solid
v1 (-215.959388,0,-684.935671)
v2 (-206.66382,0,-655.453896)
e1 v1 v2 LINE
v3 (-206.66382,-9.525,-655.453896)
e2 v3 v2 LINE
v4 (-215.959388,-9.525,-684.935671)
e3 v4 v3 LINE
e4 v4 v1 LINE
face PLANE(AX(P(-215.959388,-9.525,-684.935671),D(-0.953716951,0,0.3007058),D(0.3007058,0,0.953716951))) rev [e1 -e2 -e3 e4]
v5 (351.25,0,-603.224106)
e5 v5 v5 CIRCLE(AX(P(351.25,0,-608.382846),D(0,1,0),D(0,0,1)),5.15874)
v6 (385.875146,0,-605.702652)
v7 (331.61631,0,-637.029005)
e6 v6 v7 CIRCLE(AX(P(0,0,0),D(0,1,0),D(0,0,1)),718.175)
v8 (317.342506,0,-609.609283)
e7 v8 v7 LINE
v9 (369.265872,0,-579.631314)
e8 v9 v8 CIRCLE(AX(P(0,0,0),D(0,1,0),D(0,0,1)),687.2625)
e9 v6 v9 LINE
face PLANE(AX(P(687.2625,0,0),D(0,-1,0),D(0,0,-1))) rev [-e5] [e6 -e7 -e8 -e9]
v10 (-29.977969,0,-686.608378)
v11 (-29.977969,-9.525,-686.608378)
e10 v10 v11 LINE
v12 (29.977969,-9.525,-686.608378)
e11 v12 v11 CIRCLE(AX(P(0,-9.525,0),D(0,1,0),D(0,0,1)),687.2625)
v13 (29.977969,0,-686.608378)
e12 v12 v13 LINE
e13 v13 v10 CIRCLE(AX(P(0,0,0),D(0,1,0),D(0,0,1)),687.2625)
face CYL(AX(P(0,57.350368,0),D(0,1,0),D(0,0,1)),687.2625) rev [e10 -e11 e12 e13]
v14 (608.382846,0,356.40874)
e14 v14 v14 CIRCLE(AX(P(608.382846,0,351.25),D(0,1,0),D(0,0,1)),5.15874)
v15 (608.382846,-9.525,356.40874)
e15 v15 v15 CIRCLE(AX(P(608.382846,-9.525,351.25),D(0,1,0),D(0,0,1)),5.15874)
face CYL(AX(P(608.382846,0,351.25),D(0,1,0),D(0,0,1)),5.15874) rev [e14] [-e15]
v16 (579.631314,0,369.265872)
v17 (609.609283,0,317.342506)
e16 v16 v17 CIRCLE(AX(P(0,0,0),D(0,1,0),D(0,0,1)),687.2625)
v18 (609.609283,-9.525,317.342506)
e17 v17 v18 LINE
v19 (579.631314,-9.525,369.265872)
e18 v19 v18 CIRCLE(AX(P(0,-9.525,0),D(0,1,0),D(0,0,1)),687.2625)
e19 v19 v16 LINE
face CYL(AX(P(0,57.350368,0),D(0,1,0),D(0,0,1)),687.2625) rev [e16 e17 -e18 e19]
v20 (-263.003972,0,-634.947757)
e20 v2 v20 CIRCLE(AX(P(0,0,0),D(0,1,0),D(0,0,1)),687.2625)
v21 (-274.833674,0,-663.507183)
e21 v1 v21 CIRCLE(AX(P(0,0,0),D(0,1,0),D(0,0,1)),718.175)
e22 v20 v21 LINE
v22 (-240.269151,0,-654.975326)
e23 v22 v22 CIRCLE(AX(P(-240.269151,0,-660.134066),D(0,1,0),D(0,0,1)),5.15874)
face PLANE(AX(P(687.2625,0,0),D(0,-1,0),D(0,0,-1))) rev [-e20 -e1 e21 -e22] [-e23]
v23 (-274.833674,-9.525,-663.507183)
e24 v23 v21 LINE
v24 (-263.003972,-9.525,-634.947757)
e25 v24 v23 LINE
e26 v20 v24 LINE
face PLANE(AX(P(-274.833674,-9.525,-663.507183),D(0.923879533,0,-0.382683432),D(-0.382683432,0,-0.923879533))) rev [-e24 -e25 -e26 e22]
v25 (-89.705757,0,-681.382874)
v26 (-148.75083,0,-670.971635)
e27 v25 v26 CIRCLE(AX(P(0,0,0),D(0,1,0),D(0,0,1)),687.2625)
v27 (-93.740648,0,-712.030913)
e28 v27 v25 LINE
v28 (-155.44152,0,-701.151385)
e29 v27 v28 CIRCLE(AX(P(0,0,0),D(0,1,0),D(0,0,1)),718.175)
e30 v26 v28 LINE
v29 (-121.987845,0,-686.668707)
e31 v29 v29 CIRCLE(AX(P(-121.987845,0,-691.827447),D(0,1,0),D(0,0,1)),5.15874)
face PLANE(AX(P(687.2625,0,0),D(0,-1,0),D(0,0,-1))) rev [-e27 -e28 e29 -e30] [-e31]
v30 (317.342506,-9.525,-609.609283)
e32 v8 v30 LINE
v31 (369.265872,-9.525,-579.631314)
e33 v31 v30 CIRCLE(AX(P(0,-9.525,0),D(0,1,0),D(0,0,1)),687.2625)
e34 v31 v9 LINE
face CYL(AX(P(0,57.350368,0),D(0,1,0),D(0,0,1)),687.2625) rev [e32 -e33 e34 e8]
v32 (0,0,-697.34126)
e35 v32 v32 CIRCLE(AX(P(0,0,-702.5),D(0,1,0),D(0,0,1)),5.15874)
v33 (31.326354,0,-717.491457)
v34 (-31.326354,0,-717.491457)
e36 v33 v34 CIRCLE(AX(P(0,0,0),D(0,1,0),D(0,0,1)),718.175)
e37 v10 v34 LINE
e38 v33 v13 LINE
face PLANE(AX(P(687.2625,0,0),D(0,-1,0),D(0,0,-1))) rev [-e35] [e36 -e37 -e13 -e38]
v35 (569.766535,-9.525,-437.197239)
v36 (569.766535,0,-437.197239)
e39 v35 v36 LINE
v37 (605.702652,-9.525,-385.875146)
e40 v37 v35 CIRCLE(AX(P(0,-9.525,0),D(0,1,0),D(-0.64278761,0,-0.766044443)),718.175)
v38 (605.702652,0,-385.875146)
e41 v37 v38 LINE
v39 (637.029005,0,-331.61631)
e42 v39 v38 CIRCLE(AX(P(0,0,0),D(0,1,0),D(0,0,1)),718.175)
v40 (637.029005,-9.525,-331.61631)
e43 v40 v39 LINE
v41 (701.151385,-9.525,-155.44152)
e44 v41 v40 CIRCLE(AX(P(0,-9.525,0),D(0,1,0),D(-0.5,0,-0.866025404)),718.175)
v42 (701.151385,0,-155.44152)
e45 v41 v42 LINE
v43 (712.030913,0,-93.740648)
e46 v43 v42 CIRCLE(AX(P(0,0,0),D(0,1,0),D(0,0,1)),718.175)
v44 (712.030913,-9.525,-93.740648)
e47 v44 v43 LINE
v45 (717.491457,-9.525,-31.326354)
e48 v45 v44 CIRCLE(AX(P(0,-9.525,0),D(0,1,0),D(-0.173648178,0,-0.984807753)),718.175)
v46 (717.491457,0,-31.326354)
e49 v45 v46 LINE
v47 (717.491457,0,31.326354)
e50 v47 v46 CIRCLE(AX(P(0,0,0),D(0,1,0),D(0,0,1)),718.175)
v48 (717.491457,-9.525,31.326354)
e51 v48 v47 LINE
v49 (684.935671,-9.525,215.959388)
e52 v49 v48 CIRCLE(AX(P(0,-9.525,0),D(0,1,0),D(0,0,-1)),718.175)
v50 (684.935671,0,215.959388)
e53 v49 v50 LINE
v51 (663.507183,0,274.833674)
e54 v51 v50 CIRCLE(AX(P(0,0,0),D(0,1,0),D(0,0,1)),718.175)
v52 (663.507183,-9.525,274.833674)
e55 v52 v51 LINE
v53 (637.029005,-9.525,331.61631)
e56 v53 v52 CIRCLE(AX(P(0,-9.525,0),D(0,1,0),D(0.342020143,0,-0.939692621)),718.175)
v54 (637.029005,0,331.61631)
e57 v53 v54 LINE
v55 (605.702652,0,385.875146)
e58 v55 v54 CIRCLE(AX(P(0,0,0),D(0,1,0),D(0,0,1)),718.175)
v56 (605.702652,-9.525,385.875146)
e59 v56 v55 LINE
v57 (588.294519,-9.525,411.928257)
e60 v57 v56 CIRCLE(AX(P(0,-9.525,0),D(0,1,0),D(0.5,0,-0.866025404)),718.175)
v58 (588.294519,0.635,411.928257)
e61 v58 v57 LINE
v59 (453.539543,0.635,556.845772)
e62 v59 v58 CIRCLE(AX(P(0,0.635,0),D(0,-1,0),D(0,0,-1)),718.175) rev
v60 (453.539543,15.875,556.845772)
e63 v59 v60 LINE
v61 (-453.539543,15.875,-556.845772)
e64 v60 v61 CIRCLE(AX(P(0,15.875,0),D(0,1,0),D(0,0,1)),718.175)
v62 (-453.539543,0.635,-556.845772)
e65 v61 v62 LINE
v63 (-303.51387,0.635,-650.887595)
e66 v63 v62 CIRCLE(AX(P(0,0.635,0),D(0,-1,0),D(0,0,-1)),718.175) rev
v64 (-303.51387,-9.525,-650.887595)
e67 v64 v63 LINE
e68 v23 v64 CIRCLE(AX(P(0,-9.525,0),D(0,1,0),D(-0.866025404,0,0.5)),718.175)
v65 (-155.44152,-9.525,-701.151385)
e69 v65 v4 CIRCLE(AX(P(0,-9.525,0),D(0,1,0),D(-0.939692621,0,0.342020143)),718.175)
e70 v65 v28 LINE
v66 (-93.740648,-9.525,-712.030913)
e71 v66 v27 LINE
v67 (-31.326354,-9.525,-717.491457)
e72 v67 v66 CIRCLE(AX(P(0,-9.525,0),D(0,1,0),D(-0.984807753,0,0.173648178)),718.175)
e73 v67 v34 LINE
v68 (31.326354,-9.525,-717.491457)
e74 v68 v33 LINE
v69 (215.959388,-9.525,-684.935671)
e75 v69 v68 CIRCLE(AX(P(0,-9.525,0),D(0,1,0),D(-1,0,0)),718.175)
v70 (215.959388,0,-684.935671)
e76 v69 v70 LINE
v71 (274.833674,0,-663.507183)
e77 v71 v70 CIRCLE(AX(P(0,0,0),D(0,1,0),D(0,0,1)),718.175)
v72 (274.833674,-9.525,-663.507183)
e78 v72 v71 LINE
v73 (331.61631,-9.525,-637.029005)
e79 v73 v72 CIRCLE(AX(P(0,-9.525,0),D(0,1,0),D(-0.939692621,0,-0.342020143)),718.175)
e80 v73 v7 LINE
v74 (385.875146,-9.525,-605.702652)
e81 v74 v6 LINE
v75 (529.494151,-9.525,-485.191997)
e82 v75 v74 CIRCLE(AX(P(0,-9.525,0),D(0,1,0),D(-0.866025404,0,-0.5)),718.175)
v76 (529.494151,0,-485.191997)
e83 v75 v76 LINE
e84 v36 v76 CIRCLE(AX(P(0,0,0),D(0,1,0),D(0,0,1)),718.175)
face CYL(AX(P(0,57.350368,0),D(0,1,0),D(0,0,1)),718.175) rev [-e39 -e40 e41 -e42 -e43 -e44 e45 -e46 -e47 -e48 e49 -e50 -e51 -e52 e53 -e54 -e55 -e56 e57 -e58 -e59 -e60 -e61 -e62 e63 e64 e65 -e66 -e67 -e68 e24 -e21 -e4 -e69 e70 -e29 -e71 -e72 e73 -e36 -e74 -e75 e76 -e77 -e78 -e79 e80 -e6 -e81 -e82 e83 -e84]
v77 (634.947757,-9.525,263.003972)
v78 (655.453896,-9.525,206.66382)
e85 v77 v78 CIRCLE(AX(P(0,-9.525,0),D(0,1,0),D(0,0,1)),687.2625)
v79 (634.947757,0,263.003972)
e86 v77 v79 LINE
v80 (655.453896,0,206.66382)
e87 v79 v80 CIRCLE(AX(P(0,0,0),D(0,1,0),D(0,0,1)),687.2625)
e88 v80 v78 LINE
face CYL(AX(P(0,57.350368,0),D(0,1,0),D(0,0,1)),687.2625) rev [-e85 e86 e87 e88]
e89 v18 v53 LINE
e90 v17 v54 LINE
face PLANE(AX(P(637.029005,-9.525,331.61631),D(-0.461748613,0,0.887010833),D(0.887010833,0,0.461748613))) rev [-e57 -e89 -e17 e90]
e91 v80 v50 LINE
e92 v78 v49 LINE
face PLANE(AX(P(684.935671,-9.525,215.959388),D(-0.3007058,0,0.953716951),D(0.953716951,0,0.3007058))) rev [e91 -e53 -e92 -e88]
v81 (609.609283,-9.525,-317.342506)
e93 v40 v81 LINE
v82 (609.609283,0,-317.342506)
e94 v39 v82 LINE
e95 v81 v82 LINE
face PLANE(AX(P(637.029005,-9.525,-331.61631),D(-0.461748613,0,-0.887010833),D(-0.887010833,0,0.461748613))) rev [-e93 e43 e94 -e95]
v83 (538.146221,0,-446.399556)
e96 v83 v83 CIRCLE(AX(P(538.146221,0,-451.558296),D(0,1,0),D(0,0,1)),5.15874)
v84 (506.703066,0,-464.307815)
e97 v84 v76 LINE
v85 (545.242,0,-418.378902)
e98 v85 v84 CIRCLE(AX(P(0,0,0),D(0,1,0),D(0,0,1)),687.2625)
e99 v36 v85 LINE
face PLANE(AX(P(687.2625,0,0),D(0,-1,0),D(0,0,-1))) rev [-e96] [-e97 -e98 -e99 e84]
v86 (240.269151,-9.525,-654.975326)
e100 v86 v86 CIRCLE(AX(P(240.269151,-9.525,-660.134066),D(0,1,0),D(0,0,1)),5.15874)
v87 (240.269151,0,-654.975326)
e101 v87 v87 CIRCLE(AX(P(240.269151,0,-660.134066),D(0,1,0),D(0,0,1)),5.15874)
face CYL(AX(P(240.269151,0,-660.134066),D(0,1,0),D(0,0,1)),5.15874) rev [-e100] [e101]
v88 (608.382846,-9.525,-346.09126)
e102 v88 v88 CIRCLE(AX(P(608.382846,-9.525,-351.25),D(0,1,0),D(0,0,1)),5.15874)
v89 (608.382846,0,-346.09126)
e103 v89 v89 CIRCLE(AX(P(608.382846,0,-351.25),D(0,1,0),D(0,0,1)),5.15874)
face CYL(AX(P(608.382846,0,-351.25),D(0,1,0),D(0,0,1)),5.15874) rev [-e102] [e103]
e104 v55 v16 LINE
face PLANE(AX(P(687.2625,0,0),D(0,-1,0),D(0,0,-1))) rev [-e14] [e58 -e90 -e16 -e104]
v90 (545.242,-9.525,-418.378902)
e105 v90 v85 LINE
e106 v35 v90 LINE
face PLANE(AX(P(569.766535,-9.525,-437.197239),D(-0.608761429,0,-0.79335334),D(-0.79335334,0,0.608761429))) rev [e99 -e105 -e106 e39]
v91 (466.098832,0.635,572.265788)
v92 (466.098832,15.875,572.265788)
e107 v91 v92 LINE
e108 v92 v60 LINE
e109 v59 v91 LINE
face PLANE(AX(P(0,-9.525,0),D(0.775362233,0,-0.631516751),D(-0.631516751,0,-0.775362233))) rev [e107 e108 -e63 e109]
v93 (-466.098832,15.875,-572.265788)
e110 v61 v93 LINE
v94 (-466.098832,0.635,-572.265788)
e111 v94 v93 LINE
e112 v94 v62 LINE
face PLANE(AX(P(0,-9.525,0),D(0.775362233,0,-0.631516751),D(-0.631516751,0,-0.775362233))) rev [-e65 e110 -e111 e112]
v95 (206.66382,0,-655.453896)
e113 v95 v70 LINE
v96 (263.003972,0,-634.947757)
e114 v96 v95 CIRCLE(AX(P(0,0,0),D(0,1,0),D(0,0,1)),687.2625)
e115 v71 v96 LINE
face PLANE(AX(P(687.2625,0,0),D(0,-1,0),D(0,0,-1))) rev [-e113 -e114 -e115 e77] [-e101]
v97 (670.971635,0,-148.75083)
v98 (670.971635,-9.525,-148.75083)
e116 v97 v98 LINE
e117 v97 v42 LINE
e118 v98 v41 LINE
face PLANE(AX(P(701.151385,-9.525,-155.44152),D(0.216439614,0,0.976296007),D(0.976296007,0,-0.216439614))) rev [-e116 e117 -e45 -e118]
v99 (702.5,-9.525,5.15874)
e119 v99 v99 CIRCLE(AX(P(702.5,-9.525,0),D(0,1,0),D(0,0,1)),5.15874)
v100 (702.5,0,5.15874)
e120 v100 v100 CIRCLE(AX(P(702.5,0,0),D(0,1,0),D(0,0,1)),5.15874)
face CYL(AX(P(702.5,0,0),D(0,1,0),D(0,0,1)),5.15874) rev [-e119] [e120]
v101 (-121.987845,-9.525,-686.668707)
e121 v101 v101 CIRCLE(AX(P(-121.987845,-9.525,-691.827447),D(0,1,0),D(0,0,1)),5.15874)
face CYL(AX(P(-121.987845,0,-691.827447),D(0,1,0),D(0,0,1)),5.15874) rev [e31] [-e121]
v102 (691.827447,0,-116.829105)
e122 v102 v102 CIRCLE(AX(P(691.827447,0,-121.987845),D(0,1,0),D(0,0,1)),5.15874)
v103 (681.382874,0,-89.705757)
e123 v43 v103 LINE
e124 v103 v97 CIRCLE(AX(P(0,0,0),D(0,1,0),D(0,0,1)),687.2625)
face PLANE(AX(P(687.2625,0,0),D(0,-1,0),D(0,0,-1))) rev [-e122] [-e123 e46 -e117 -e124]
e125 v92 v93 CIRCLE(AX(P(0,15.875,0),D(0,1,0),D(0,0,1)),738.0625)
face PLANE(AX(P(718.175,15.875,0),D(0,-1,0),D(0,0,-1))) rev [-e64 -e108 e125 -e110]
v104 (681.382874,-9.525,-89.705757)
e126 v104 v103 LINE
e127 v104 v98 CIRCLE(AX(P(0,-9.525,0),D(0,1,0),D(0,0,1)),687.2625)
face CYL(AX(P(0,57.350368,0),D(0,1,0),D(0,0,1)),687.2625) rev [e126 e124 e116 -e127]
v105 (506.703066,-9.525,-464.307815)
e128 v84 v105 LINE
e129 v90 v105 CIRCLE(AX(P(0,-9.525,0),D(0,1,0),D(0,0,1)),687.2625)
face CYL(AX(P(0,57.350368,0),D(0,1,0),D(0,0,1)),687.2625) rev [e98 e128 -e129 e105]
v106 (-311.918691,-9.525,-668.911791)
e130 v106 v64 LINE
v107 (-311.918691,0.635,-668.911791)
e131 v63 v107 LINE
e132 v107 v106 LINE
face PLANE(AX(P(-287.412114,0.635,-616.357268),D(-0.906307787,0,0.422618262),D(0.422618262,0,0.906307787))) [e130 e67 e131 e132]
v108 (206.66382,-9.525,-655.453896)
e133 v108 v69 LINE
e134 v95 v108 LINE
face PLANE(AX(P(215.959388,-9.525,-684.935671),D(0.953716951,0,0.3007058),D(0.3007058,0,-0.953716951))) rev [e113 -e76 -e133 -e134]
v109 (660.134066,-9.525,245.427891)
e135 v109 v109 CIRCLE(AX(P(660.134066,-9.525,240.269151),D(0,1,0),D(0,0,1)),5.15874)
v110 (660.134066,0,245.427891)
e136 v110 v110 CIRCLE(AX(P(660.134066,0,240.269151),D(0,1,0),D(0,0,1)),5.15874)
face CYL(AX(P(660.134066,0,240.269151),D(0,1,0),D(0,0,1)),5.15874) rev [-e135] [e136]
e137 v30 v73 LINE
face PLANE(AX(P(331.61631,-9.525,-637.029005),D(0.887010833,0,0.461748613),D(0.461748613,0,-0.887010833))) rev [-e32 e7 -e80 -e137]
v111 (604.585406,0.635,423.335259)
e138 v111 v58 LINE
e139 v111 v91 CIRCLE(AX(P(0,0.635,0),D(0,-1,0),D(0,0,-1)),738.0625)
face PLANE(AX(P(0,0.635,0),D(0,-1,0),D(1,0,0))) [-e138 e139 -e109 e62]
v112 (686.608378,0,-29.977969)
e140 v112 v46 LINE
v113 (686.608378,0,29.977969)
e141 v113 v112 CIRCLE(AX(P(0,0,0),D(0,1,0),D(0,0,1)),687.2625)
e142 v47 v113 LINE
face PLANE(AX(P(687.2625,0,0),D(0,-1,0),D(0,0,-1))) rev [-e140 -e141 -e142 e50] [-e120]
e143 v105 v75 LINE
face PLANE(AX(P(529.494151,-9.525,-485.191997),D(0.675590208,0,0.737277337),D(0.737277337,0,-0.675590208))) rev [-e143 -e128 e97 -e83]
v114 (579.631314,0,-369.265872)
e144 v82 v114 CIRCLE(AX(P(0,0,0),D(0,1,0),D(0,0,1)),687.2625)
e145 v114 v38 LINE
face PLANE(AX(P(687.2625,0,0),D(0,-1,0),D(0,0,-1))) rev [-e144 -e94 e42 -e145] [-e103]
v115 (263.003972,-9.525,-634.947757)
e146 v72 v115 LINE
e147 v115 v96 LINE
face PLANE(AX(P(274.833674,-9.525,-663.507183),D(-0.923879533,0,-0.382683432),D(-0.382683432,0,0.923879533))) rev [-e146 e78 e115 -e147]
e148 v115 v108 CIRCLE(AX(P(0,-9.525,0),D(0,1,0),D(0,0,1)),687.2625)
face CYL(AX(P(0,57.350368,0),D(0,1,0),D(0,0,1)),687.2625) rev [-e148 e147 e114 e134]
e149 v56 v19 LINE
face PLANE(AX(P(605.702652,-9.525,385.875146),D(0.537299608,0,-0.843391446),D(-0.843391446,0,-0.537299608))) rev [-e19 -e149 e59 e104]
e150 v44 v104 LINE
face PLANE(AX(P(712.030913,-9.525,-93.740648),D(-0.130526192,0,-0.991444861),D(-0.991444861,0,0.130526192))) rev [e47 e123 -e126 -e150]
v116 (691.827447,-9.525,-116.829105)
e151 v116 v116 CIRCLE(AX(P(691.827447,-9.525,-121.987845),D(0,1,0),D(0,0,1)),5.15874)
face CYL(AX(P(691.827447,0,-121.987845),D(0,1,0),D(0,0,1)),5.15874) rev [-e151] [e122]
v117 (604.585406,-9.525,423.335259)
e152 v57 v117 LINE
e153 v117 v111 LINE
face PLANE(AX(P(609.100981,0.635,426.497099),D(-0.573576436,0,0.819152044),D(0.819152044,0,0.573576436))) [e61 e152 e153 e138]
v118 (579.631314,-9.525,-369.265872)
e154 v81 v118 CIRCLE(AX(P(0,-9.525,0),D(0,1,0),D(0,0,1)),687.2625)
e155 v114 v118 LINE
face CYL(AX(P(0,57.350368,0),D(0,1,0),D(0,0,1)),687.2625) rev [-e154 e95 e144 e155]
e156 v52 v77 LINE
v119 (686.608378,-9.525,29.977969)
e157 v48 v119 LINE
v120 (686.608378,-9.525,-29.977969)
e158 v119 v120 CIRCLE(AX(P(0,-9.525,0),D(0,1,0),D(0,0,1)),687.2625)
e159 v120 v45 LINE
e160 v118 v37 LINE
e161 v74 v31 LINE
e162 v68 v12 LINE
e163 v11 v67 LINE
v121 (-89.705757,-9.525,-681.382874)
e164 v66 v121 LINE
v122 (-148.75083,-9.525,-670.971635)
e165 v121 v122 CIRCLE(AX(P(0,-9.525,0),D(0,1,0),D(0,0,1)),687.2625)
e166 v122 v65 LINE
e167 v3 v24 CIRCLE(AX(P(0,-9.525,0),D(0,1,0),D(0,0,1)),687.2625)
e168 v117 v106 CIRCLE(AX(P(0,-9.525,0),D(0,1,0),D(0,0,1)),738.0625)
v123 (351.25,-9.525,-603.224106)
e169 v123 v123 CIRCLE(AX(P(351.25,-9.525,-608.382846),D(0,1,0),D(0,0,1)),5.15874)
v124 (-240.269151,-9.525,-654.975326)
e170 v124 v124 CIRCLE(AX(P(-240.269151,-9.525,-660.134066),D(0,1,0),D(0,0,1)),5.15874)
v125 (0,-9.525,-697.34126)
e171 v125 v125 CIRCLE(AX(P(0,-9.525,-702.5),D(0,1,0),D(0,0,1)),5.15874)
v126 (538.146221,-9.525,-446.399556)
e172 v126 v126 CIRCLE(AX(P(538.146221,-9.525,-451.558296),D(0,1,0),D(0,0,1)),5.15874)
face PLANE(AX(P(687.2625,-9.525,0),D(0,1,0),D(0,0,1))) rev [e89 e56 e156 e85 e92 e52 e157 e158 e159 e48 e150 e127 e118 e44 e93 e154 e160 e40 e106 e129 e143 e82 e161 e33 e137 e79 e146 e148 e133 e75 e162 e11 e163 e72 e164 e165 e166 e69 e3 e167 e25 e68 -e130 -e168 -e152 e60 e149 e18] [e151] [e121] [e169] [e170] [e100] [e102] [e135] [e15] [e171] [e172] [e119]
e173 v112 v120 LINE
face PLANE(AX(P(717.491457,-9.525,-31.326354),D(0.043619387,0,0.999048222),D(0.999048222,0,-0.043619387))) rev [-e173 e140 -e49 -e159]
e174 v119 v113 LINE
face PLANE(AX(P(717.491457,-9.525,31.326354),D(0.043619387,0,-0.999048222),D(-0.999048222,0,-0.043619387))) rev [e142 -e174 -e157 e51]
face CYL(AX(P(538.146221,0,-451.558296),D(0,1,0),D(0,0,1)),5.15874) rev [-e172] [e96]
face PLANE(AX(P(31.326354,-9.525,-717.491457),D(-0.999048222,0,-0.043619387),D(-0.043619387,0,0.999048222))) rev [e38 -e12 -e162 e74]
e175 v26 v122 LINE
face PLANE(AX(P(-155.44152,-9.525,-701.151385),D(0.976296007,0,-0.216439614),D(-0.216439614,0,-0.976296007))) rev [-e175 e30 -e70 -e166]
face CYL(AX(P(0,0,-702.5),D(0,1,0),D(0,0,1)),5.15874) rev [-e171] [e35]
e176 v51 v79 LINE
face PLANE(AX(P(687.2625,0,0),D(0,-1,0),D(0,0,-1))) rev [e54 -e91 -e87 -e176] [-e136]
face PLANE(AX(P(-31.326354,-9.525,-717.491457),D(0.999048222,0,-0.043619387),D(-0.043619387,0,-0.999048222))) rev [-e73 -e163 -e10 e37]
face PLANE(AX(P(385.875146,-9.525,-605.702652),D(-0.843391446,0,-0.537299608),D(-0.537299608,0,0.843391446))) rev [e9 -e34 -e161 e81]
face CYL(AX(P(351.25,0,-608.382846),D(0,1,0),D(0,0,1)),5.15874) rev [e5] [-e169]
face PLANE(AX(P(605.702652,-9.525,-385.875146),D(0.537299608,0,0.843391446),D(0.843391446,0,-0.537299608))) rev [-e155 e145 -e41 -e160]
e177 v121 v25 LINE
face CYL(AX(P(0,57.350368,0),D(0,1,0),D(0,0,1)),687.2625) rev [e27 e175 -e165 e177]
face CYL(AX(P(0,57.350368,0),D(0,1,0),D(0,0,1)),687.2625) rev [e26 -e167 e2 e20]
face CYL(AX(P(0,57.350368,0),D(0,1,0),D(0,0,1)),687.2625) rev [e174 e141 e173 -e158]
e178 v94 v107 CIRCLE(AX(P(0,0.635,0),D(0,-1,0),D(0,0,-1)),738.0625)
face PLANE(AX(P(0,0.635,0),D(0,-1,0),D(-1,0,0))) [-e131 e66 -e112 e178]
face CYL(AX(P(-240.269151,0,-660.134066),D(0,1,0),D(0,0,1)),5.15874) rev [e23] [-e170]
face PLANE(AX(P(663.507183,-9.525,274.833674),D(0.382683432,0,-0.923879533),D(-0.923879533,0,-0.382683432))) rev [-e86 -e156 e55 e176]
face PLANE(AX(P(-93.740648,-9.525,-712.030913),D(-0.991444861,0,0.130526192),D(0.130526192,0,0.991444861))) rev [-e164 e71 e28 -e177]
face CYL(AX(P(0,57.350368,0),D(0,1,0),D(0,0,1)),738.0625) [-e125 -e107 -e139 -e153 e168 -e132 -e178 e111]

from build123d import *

# Parameters (mm, degrees)
F_3_8_CLEARANCE_HOLE1_D = 10.31748
CUT_EXTRUDE1_DEPTH      = 1044.898713202
CIRPATTERN1_COUNT       = 36
CUT_EXTRUDE_THIN1_START = -10.16
CUT_EXTRUDE_THIN1_DEPTH = 1055.247002027
CIRPATTERN3_COUNT       = 2
CUT_EXTRUDE3_DEPTH      = 1045.087002027
CUT_EXTRUDE4_DEPTH      = 1045.087002027


with BuildPart() as part:
    # Sketch1 → Revolve1 (revolve)
    with BuildSketch(Plane.XY, mode=Mode.PRIVATE) as revolve1_sk:
        Polygon((687.262499996, 0), (687.262499996, -9.525), (738.062499996, -9.525), (738.062499996, 0), (738.062499996, 15.875), (718.17500002, 15.875), (718.17500002, 0), align=None)
    revolve(revolve1_sk.sketch.rotate(Axis((0, 57.350368034, 0), (0, -1, 0)), 90), axis=Axis((0, 57.350368034, 0), (0, -1, 0)))

    # 3/8 Clearance Hole1 (through all)
    with Locations(Plane(origin=(0, 0, 0), x_dir=(1, 0, 0), z_dir=(0, 1, 0))):
        with Locations((702.500000128, 0)):
            f_3_8_clearance_hole1 = Hole(F_3_8_CLEARANCE_HOLE1_D / 2)

    # Sketch16 → Cut-Extrude1 (cut, through all)
    with BuildSketch(Plane(origin=(0, 0, 0), x_dir=(1, 0, 0), z_dir=(0, 1, 0))):
        with BuildLine():
            Line((712.030913337, -93.7406481), (681.382874036, -89.70575718))
            Line((681.382874036, -89.70575718), (0, 0))
            Line((0, 0), (686.608378381, -29.977969209))
            Line((686.608378381, -29.977969209), (717.491456555, -31.326353522))
            ThreePointArc((717.491456555, -31.326353522), (715.442127322, -62.59307555), (712.030913337, -93.7406481))
        make_face()
    cut_extrude1 = extrude(amount=-CUT_EXTRUDE1_DEPTH, mode=Mode.SUBTRACT)

    # CirPattern1: 3/8 Clearance Hole1, Cut-Extrude1 ×36 about axis
    cirpattern1_axis = Axis((0, 0, 0), (0, 1, 0))
    add([f_3_8_clearance_hole1.rotate(cirpattern1_axis, i * 360 / CIRPATTERN1_COUNT) for i in range(1, CIRPATTERN1_COUNT)], mode=Mode.SUBTRACT)
    add([cut_extrude1.rotate(cirpattern1_axis, i * 360 / CIRPATTERN1_COUNT) for i in range(1, CIRPATTERN1_COUNT)], mode=Mode.SUBTRACT)

    # Sketch18 → Cut-Extrude-Thin1 (cut)
    with BuildSketch(Plane.XZ.offset(9.525).offset(CUT_EXTRUDE_THIN1_START)):
        with BuildLine():
            ThreePointArc((314.248373982, 673.907812764), (477.960796886, 569.611496808), (609.100981349, 426.497098671))
            Line((609.100981349, 426.497098671), (557.084826536, 390.074994963))
            ThreePointArc((557.084826536, 390.074994963), (437.14378367, 520.967674669), (287.412114362, 616.357268287))
            Line((287.412114362, 616.357268287), (314.248373982, 673.907812764))
        make_face()
    cut_extrude_thin1 = extrude(amount=CUT_EXTRUDE_THIN1_DEPTH, mode=Mode.SUBTRACT)

    # CirPattern3: Cut-Extrude-Thin1 ×2 about axis
    cirpattern3_axis = Axis((0, 0, 0), (0, 1, 0))
    for i in range(1, CIRPATTERN3_COUNT):
        add(cut_extrude_thin1.rotate(cirpattern3_axis, i * 360 / CIRPATTERN3_COUNT), mode=Mode.SUBTRACT)

    # Sketch41 → Cut-Extrude3 (cut, through all)
    with BuildSketch(Plane.XZ.offset(9.525)):
        with BuildLine():
            Line((693.703780314, 185.877367722), (663.844598186, 177.876623984))
            ThreePointArc((663.844598186, 177.876623984), (676.821438351, 119.341880703), (684.647258693, 59.89887365))
            Line((684.647258693, 59.89887365), (715.442127322, 62.59307555))
            ThreePointArc((715.442127322, 62.59307555), (707.264308039, 124.709779999), (693.703780314, 185.877367722))
        make_face()
        with BuildLine():
            Line((693.703780314, -185.877367722), (663.844598186, -177.876623984))
            ThreePointArc((663.844598186, -177.876623984), (645.815499789, -235.057618751), (622.871355485, -290.449683108))
            Line((622.871355485, -290.449683108), (650.887594973, -303.513870134))
            ThreePointArc((650.887594973, -303.513870134), (674.863747952, -245.63031644), (693.703780314, -185.877367722))
        make_face()
        with BuildLine():
            Line((507.826412593, -507.826412593), (485.967974202, -485.967974202))
            ThreePointArc((485.967974202, -485.967974202), (441.7638196, -526.473619086), (394.197575585, -562.972481835))
            Line((394.197575585, -562.972481835), (411.928257188, -588.294519424))
            ThreePointArc((411.928257188, -588.294519424), (461.633991599, -550.153967952), (507.826412593, -507.826412593))
        make_face()
        with BuildLine():
            Line((185.877367722, -693.703780314), (177.876623984, -663.844598186))
            ThreePointArc((177.876623984, -663.844598186), (119.341880703, -676.821438351), (59.89887365, -684.647258693))
            Line((59.89887365, -684.647258693), (62.593075549, -715.442127322))
            ThreePointArc((62.593075549, -715.442127322), (124.709779999, -707.264308039), (185.877367722, -693.703780314))
        make_face()
        with BuildLine():
            Line((-693.703780315, -185.877367721), (-663.844598186, -177.876623984))
            ThreePointArc((-663.844598186, -177.876623984), (-676.821438351, -119.341880703), (-684.647258693, -59.89887365))
            Line((-684.647258693, -59.89887365), (-715.442127322, -62.593075549))
            ThreePointArc((-715.442127322, -62.593075549), (-707.264308039, -124.709779999), (-693.703780315, -185.877367721))
        make_face()
        with BuildLine():
            Line((-693.703780314, 185.877367722), (-663.844598186, 177.876623984))
            ThreePointArc((-663.844598186, 177.876623984), (-645.815499789, 235.057618751), (-622.871355485, 290.449683108))
            Line((-622.871355485, 290.449683108), (-650.887594973, 303.513870134))
            ThreePointArc((-650.887594973, 303.513870134), (-674.863747952, 245.63031644), (-693.703780314, 185.877367722))
        make_face()
        with BuildLine():
            Line((-507.826412593, 507.826412593), (-485.967974202, 485.967974203))
            ThreePointArc((-485.967974202, 485.967974203), (-441.763819599, 526.473619086), (-394.197575585, 562.972481835))
            Line((-394.197575585, 562.972481835), (-411.928257188, 588.294519424))
            ThreePointArc((-411.928257188, 588.294519424), (-461.633991599, 550.153967952), (-507.826412593, 507.826412593))
        make_face()
        with BuildLine():
            Line((-185.877367721, 693.703780315), (-177.876623983, 663.844598186))
            ThreePointArc((-177.876623983, 663.844598186), (-119.341880703, 676.821438351), (-59.898873649, 684.647258693))
            Line((-59.898873649, 684.647258693), (-62.593075549, 715.442127322))
            ThreePointArc((-62.593075549, 715.442127322), (-124.709779999, 707.264308039), (-185.877367721, 693.703780315))
        make_face()
    extrude(amount=-CUT_EXTRUDE3_DEPTH, mode=Mode.SUBTRACT)

    # Sketch42 → Cut-Extrude4 (cut, through all)
    with BuildSketch(Plane(origin=(0, 15.875, 0), x_dir=(1, 0, 0), z_dir=(0, 1, 0))):
        with BuildLine():
            ThreePointArc((-466.098832167, 572.265788383), (-572.265788383, -466.098832167), (466.098832167, -572.265788383))
            Line((466.098832167, -572.265788383), (453.539542793, -556.845771985))
            ThreePointArc((453.539542793, -556.845771984), (240.689237761, -676.64172313), (0, -718.17500002))
            ThreePointArc((0, -718.17500002), (-31.326353522, -717.491456555), (-62.593075549, -715.442127322))
            ThreePointArc((-62.593075549, -715.442127322), (-124.709779999, -707.264308039), (-185.877367721, -693.703780315))
            ThreePointArc((-185.877367721, -693.703780315), (-303.513870134, -650.887594973), (-411.928257188, -588.294519424))
            ThreePointArc((-411.928257188, -588.294519424), (-461.633991599, -550.153967952), (-507.826412593, -507.826412593))
            ThreePointArc((-507.826412593, -507.826412593), (-588.294519423, -411.928257188), (-650.887594973, -303.513870134))
            ThreePointArc((-650.887594973, -303.513870134), (-674.863747952, -245.63031644), (-693.703780314, -185.877367722))
            ThreePointArc((-693.703780314, -185.877367722), (-715.442127322, -62.59307555), (-715.442127322, 62.593075549))
            ThreePointArc((-715.442127322, 62.593075549), (-707.264308039, 124.709779999), (-693.703780315, 185.877367721))
            ThreePointArc((-693.703780315, 185.877367721), (-602.864993049, 390.293646899), (-453.539542793, 556.845771984))
            Line((-453.539542793, 556.845771985), (-466.098832167, 572.265788383))
        make_face()
    extrude(amount=-CUT_EXTRUDE4_DEPTH, mode=Mode.SUBTRACT)


with BuildPart() as cut_extrude4_kept_piece:
    # of the separate pieces the step leaves, the one the design keeps (cut_extrude4_pieces_kept)
    add(part.part.solids().sort_by_distance((-311.918690804, -9.525, -668.911791066))[0])


solid = cut_extrude4_kept_piece.part
